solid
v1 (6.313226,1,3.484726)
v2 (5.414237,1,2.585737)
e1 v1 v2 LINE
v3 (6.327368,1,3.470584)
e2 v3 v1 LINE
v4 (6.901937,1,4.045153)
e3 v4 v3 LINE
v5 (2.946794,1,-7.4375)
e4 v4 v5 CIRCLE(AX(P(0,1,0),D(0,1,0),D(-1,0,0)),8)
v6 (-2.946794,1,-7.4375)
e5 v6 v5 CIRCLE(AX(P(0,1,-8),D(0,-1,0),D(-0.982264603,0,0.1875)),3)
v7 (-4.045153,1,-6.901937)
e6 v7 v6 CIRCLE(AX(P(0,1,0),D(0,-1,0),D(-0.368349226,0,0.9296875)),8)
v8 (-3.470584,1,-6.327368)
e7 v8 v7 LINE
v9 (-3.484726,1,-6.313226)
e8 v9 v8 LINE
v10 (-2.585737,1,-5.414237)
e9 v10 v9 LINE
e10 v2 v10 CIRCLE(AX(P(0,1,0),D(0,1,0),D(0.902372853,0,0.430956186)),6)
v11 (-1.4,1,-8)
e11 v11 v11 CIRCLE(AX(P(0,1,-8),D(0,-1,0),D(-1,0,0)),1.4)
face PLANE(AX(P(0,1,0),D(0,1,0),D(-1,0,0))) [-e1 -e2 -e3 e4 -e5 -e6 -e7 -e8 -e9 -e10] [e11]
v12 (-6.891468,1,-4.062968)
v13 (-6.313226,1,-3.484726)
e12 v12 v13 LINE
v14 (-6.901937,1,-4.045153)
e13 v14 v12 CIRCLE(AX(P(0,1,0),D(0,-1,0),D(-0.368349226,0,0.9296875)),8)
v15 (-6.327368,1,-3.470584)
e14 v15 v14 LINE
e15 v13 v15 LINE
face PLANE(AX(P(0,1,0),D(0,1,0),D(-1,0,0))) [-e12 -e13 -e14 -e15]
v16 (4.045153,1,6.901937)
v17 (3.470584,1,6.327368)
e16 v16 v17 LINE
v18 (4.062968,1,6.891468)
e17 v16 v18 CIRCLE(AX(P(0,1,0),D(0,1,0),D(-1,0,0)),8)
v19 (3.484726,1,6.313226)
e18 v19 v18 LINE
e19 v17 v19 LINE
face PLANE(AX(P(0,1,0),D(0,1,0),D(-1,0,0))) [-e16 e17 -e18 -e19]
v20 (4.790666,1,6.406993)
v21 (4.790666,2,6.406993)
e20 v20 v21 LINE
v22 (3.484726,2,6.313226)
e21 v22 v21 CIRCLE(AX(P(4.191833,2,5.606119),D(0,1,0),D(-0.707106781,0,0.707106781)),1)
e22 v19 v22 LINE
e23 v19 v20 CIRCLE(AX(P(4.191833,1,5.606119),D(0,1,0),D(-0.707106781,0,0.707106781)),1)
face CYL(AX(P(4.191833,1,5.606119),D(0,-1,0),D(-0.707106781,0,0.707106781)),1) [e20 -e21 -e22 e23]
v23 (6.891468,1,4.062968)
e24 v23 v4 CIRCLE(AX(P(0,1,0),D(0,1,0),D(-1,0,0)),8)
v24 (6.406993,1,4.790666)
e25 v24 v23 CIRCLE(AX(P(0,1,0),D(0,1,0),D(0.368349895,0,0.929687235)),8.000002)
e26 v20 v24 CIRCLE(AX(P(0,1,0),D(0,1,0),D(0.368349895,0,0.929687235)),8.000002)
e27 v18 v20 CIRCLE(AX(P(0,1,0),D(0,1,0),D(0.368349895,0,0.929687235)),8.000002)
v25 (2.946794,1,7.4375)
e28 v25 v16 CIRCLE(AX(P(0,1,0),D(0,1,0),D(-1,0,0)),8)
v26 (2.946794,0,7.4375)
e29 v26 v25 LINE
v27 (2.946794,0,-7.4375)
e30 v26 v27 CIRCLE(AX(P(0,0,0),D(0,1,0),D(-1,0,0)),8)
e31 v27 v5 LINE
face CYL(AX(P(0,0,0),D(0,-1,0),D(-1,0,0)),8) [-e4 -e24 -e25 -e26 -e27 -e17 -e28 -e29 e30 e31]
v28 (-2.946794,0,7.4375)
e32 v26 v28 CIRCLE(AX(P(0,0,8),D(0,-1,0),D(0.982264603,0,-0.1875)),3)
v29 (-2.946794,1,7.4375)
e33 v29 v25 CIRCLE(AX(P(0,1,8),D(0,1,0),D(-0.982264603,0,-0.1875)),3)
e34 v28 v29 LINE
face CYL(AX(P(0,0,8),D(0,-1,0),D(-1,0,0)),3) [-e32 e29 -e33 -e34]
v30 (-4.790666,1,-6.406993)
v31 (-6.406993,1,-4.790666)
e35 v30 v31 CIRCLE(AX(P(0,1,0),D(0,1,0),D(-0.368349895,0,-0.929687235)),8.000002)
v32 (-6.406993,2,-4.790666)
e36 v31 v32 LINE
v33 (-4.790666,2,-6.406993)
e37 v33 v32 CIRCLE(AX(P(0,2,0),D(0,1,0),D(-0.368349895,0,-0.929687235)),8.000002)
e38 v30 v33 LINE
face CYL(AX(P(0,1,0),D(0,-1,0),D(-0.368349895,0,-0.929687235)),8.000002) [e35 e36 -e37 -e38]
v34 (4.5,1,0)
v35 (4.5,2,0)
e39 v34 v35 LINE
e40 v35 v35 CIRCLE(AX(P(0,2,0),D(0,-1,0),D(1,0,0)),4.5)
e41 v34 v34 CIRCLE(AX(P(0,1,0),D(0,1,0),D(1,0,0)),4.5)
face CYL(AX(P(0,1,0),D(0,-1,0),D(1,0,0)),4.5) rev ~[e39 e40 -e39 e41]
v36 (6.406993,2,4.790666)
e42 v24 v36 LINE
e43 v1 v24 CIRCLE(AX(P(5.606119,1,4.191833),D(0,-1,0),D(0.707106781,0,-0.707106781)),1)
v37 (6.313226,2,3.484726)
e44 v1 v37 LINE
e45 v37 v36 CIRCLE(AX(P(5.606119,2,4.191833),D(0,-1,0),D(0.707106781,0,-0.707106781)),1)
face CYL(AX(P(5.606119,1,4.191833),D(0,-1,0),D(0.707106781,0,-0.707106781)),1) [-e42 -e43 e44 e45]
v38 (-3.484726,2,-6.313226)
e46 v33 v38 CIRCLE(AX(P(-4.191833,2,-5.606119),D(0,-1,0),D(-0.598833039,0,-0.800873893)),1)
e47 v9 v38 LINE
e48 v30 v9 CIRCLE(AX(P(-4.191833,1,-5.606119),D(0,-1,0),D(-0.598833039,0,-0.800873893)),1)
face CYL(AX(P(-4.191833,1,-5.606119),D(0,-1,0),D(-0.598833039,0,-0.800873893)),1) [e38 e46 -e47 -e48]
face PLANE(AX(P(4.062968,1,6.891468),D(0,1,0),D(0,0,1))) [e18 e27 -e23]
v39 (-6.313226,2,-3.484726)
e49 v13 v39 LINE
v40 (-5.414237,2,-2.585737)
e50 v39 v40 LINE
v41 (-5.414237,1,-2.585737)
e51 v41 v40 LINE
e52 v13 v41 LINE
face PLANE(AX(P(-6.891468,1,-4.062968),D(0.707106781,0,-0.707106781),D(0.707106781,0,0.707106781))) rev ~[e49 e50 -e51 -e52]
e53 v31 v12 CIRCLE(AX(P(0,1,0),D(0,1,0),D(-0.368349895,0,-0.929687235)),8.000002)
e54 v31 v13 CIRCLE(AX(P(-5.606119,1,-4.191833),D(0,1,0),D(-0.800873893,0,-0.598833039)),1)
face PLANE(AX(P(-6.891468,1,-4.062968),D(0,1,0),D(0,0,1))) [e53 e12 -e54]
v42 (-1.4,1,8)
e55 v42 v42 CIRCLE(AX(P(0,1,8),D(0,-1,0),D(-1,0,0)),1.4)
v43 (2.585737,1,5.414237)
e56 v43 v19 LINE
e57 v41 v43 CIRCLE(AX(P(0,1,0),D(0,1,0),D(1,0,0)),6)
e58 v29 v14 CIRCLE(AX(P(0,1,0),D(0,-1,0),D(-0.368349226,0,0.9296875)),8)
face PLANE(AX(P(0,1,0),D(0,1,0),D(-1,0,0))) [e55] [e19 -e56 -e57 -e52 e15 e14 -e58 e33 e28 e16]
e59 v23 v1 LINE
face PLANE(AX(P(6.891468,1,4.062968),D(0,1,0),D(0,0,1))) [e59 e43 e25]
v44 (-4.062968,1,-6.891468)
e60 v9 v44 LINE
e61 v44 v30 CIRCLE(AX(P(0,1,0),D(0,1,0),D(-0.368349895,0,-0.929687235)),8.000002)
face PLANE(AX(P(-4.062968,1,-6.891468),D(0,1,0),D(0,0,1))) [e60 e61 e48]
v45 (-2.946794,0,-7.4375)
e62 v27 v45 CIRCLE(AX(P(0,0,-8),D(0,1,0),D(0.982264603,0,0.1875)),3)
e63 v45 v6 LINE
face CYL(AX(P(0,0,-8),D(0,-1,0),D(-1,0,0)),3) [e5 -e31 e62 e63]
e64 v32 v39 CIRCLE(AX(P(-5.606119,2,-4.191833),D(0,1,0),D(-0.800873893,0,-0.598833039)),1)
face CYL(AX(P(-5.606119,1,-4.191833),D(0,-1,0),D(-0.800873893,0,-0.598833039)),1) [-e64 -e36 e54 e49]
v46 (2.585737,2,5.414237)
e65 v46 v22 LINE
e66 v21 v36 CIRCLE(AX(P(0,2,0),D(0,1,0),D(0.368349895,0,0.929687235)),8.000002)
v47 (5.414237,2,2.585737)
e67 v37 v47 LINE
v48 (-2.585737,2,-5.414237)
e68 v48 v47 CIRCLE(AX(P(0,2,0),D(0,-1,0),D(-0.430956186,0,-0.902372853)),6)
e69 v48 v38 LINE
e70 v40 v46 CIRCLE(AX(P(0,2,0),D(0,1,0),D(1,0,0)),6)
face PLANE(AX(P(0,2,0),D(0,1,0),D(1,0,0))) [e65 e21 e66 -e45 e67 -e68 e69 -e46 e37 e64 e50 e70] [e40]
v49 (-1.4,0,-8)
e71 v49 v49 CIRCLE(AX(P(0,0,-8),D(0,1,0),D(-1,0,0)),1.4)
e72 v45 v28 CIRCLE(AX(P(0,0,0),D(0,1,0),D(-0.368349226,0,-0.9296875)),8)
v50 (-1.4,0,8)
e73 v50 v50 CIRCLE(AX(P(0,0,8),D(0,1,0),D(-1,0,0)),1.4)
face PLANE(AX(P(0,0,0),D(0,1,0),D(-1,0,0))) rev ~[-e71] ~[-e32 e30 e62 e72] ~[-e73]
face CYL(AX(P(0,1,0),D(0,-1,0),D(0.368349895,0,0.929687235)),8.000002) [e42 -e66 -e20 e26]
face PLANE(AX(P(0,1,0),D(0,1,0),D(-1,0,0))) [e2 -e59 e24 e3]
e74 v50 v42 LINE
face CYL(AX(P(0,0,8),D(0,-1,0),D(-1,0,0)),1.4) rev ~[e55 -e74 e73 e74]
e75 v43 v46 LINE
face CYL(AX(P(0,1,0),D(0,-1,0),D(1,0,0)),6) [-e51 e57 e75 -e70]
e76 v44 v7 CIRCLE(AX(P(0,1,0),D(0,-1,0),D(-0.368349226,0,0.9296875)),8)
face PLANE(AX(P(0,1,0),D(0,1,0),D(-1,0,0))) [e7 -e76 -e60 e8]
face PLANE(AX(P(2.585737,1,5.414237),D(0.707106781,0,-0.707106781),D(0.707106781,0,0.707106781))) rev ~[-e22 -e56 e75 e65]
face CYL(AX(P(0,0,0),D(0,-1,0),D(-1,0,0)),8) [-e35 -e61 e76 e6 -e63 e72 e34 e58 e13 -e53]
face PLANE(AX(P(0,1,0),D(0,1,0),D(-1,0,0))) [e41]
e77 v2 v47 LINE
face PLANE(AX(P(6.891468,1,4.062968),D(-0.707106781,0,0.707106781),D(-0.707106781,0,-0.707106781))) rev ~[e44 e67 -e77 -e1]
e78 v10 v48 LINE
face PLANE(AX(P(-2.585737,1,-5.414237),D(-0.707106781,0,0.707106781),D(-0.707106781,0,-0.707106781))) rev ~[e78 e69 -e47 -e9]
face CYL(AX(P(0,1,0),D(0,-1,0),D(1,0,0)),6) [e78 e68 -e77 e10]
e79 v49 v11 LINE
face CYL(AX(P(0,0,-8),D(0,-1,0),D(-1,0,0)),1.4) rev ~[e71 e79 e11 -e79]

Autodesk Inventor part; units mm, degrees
ref_plane "YZ Plane" through (0, 0, 0) normal (1, 0, 0) x (0, 1, 0)
ref_plane "XZ Plane" through (0, 0, 0) normal (0, 1, 0) x (-1, 0, 0)
ref_plane "XY Plane" through (0, 0, 0) normal (0, 0, 1) x (1, 0, 0)
sketch "Sketch1" plane through (0, 0, 0) normal (0, 1, 0) x (-1, 0, 0)
  circle A0 centre (0, 0) radius 8
  circle A1 centre (0, -8) radius 3
  circle A2 centre (0, 8) radius 3
  line L0 (0, 8) -> (0, -8)
  circle A3 centre (0, 8) radius 1.4
  circle A4 centre (0, -8) radius 1.4
  line L1 (0, 11) -> (0, -11) construction
  point P0 (-2.9468, -7.4375)
  point P1 (2.9468, -7.4375)
  point P2 (2.9468, 7.4375)
  point P3 (-2.9468, 7.4375)
  dimension "d2" = 6
  dimension "d0" = 16
  dimension "d3" = 2.8
  dimension "d4" = 22
extrude "Extrusion1" add sketch "Sketch1" along normal blind 1 contours A0 A1 L0 A2 | A2 L0 A3 A0 | A0 A3 A2 | A1 A0 A4 | A0 A4 L0 A1 | L0 A1 A0 A2 | A2 A0 A3 L0 | L0 A4 A0 A1
sketch "Sketch2" plane through (0, 1, 0) normal (0, 1, 0) x (1, 0, 0)
  circle A0 centre (0, 0) radius 6
  circle A1 centre (0, 0) radius 4.5
  arc A2 (-2.9468, 7.4375) -> (-2.9468, -7.4375) centre (0, 0) ccw projected
  line L0 (-5.6569, 5.6569) -> (5.6569, -5.6569) construction
  arc A3 (2.9468, -7.4375) -> (2.9468, 7.4375) centre (0, 0) ccw projected
  line L1 (-7.0711, 4.2426) -> (4.2426, -7.0711)
  line L2 (7.0711, -4.2426) -> (-4.2426, 7.0711)
  arc A4 (-4.2426, 7.0711) -> (-7.0711, 4.2426) centre (-5.6569, 5.6569) ccw
  arc A5 (4.2426, -7.0711) -> (7.0711, -4.2426) centre (5.6569, -5.6569) ccw
  circle A6 centre (0, 8) radius 1.4 projected
  line L3 (0, 0) -> (0, 8) construction
  point P0 (5.4142, -2.5858)
  point P1 (-2.5858, 5.4142)
  point P2 (-4.063, 6.8914)
  point P3 (-6.8914, 4.063)
  point P4 (-5.4142, 2.5858)
  point P5 (2.5858, -5.4142)
  point P6 (4.063, -6.8914)
  point P7 (6.8914, -4.063)
  dimension "d7" = 12
  dimension "d8" = 9
  dimension "d9" = 4
  dimension "d10" = 45
extrude "Extrusion2" add sketch "Sketch2" along normal blind 1 contours A0 L2 A1 | L2 A1 L1 A0 | A0 L1 A2 L2 | L2 A3 L1 A0 | A0 L1 A1 L2 | L1 A1 A0
fillet "Fillet1" radius 1 4 edges at (4.063, 1.5, 6.8914) (6.8914, 1.5, 4.063) (-4.063, 1.5, -6.8914) (-6.8914, 1.5, -4.063)
properties part number "Ш.03.Створка" material "ABS Plastic"
